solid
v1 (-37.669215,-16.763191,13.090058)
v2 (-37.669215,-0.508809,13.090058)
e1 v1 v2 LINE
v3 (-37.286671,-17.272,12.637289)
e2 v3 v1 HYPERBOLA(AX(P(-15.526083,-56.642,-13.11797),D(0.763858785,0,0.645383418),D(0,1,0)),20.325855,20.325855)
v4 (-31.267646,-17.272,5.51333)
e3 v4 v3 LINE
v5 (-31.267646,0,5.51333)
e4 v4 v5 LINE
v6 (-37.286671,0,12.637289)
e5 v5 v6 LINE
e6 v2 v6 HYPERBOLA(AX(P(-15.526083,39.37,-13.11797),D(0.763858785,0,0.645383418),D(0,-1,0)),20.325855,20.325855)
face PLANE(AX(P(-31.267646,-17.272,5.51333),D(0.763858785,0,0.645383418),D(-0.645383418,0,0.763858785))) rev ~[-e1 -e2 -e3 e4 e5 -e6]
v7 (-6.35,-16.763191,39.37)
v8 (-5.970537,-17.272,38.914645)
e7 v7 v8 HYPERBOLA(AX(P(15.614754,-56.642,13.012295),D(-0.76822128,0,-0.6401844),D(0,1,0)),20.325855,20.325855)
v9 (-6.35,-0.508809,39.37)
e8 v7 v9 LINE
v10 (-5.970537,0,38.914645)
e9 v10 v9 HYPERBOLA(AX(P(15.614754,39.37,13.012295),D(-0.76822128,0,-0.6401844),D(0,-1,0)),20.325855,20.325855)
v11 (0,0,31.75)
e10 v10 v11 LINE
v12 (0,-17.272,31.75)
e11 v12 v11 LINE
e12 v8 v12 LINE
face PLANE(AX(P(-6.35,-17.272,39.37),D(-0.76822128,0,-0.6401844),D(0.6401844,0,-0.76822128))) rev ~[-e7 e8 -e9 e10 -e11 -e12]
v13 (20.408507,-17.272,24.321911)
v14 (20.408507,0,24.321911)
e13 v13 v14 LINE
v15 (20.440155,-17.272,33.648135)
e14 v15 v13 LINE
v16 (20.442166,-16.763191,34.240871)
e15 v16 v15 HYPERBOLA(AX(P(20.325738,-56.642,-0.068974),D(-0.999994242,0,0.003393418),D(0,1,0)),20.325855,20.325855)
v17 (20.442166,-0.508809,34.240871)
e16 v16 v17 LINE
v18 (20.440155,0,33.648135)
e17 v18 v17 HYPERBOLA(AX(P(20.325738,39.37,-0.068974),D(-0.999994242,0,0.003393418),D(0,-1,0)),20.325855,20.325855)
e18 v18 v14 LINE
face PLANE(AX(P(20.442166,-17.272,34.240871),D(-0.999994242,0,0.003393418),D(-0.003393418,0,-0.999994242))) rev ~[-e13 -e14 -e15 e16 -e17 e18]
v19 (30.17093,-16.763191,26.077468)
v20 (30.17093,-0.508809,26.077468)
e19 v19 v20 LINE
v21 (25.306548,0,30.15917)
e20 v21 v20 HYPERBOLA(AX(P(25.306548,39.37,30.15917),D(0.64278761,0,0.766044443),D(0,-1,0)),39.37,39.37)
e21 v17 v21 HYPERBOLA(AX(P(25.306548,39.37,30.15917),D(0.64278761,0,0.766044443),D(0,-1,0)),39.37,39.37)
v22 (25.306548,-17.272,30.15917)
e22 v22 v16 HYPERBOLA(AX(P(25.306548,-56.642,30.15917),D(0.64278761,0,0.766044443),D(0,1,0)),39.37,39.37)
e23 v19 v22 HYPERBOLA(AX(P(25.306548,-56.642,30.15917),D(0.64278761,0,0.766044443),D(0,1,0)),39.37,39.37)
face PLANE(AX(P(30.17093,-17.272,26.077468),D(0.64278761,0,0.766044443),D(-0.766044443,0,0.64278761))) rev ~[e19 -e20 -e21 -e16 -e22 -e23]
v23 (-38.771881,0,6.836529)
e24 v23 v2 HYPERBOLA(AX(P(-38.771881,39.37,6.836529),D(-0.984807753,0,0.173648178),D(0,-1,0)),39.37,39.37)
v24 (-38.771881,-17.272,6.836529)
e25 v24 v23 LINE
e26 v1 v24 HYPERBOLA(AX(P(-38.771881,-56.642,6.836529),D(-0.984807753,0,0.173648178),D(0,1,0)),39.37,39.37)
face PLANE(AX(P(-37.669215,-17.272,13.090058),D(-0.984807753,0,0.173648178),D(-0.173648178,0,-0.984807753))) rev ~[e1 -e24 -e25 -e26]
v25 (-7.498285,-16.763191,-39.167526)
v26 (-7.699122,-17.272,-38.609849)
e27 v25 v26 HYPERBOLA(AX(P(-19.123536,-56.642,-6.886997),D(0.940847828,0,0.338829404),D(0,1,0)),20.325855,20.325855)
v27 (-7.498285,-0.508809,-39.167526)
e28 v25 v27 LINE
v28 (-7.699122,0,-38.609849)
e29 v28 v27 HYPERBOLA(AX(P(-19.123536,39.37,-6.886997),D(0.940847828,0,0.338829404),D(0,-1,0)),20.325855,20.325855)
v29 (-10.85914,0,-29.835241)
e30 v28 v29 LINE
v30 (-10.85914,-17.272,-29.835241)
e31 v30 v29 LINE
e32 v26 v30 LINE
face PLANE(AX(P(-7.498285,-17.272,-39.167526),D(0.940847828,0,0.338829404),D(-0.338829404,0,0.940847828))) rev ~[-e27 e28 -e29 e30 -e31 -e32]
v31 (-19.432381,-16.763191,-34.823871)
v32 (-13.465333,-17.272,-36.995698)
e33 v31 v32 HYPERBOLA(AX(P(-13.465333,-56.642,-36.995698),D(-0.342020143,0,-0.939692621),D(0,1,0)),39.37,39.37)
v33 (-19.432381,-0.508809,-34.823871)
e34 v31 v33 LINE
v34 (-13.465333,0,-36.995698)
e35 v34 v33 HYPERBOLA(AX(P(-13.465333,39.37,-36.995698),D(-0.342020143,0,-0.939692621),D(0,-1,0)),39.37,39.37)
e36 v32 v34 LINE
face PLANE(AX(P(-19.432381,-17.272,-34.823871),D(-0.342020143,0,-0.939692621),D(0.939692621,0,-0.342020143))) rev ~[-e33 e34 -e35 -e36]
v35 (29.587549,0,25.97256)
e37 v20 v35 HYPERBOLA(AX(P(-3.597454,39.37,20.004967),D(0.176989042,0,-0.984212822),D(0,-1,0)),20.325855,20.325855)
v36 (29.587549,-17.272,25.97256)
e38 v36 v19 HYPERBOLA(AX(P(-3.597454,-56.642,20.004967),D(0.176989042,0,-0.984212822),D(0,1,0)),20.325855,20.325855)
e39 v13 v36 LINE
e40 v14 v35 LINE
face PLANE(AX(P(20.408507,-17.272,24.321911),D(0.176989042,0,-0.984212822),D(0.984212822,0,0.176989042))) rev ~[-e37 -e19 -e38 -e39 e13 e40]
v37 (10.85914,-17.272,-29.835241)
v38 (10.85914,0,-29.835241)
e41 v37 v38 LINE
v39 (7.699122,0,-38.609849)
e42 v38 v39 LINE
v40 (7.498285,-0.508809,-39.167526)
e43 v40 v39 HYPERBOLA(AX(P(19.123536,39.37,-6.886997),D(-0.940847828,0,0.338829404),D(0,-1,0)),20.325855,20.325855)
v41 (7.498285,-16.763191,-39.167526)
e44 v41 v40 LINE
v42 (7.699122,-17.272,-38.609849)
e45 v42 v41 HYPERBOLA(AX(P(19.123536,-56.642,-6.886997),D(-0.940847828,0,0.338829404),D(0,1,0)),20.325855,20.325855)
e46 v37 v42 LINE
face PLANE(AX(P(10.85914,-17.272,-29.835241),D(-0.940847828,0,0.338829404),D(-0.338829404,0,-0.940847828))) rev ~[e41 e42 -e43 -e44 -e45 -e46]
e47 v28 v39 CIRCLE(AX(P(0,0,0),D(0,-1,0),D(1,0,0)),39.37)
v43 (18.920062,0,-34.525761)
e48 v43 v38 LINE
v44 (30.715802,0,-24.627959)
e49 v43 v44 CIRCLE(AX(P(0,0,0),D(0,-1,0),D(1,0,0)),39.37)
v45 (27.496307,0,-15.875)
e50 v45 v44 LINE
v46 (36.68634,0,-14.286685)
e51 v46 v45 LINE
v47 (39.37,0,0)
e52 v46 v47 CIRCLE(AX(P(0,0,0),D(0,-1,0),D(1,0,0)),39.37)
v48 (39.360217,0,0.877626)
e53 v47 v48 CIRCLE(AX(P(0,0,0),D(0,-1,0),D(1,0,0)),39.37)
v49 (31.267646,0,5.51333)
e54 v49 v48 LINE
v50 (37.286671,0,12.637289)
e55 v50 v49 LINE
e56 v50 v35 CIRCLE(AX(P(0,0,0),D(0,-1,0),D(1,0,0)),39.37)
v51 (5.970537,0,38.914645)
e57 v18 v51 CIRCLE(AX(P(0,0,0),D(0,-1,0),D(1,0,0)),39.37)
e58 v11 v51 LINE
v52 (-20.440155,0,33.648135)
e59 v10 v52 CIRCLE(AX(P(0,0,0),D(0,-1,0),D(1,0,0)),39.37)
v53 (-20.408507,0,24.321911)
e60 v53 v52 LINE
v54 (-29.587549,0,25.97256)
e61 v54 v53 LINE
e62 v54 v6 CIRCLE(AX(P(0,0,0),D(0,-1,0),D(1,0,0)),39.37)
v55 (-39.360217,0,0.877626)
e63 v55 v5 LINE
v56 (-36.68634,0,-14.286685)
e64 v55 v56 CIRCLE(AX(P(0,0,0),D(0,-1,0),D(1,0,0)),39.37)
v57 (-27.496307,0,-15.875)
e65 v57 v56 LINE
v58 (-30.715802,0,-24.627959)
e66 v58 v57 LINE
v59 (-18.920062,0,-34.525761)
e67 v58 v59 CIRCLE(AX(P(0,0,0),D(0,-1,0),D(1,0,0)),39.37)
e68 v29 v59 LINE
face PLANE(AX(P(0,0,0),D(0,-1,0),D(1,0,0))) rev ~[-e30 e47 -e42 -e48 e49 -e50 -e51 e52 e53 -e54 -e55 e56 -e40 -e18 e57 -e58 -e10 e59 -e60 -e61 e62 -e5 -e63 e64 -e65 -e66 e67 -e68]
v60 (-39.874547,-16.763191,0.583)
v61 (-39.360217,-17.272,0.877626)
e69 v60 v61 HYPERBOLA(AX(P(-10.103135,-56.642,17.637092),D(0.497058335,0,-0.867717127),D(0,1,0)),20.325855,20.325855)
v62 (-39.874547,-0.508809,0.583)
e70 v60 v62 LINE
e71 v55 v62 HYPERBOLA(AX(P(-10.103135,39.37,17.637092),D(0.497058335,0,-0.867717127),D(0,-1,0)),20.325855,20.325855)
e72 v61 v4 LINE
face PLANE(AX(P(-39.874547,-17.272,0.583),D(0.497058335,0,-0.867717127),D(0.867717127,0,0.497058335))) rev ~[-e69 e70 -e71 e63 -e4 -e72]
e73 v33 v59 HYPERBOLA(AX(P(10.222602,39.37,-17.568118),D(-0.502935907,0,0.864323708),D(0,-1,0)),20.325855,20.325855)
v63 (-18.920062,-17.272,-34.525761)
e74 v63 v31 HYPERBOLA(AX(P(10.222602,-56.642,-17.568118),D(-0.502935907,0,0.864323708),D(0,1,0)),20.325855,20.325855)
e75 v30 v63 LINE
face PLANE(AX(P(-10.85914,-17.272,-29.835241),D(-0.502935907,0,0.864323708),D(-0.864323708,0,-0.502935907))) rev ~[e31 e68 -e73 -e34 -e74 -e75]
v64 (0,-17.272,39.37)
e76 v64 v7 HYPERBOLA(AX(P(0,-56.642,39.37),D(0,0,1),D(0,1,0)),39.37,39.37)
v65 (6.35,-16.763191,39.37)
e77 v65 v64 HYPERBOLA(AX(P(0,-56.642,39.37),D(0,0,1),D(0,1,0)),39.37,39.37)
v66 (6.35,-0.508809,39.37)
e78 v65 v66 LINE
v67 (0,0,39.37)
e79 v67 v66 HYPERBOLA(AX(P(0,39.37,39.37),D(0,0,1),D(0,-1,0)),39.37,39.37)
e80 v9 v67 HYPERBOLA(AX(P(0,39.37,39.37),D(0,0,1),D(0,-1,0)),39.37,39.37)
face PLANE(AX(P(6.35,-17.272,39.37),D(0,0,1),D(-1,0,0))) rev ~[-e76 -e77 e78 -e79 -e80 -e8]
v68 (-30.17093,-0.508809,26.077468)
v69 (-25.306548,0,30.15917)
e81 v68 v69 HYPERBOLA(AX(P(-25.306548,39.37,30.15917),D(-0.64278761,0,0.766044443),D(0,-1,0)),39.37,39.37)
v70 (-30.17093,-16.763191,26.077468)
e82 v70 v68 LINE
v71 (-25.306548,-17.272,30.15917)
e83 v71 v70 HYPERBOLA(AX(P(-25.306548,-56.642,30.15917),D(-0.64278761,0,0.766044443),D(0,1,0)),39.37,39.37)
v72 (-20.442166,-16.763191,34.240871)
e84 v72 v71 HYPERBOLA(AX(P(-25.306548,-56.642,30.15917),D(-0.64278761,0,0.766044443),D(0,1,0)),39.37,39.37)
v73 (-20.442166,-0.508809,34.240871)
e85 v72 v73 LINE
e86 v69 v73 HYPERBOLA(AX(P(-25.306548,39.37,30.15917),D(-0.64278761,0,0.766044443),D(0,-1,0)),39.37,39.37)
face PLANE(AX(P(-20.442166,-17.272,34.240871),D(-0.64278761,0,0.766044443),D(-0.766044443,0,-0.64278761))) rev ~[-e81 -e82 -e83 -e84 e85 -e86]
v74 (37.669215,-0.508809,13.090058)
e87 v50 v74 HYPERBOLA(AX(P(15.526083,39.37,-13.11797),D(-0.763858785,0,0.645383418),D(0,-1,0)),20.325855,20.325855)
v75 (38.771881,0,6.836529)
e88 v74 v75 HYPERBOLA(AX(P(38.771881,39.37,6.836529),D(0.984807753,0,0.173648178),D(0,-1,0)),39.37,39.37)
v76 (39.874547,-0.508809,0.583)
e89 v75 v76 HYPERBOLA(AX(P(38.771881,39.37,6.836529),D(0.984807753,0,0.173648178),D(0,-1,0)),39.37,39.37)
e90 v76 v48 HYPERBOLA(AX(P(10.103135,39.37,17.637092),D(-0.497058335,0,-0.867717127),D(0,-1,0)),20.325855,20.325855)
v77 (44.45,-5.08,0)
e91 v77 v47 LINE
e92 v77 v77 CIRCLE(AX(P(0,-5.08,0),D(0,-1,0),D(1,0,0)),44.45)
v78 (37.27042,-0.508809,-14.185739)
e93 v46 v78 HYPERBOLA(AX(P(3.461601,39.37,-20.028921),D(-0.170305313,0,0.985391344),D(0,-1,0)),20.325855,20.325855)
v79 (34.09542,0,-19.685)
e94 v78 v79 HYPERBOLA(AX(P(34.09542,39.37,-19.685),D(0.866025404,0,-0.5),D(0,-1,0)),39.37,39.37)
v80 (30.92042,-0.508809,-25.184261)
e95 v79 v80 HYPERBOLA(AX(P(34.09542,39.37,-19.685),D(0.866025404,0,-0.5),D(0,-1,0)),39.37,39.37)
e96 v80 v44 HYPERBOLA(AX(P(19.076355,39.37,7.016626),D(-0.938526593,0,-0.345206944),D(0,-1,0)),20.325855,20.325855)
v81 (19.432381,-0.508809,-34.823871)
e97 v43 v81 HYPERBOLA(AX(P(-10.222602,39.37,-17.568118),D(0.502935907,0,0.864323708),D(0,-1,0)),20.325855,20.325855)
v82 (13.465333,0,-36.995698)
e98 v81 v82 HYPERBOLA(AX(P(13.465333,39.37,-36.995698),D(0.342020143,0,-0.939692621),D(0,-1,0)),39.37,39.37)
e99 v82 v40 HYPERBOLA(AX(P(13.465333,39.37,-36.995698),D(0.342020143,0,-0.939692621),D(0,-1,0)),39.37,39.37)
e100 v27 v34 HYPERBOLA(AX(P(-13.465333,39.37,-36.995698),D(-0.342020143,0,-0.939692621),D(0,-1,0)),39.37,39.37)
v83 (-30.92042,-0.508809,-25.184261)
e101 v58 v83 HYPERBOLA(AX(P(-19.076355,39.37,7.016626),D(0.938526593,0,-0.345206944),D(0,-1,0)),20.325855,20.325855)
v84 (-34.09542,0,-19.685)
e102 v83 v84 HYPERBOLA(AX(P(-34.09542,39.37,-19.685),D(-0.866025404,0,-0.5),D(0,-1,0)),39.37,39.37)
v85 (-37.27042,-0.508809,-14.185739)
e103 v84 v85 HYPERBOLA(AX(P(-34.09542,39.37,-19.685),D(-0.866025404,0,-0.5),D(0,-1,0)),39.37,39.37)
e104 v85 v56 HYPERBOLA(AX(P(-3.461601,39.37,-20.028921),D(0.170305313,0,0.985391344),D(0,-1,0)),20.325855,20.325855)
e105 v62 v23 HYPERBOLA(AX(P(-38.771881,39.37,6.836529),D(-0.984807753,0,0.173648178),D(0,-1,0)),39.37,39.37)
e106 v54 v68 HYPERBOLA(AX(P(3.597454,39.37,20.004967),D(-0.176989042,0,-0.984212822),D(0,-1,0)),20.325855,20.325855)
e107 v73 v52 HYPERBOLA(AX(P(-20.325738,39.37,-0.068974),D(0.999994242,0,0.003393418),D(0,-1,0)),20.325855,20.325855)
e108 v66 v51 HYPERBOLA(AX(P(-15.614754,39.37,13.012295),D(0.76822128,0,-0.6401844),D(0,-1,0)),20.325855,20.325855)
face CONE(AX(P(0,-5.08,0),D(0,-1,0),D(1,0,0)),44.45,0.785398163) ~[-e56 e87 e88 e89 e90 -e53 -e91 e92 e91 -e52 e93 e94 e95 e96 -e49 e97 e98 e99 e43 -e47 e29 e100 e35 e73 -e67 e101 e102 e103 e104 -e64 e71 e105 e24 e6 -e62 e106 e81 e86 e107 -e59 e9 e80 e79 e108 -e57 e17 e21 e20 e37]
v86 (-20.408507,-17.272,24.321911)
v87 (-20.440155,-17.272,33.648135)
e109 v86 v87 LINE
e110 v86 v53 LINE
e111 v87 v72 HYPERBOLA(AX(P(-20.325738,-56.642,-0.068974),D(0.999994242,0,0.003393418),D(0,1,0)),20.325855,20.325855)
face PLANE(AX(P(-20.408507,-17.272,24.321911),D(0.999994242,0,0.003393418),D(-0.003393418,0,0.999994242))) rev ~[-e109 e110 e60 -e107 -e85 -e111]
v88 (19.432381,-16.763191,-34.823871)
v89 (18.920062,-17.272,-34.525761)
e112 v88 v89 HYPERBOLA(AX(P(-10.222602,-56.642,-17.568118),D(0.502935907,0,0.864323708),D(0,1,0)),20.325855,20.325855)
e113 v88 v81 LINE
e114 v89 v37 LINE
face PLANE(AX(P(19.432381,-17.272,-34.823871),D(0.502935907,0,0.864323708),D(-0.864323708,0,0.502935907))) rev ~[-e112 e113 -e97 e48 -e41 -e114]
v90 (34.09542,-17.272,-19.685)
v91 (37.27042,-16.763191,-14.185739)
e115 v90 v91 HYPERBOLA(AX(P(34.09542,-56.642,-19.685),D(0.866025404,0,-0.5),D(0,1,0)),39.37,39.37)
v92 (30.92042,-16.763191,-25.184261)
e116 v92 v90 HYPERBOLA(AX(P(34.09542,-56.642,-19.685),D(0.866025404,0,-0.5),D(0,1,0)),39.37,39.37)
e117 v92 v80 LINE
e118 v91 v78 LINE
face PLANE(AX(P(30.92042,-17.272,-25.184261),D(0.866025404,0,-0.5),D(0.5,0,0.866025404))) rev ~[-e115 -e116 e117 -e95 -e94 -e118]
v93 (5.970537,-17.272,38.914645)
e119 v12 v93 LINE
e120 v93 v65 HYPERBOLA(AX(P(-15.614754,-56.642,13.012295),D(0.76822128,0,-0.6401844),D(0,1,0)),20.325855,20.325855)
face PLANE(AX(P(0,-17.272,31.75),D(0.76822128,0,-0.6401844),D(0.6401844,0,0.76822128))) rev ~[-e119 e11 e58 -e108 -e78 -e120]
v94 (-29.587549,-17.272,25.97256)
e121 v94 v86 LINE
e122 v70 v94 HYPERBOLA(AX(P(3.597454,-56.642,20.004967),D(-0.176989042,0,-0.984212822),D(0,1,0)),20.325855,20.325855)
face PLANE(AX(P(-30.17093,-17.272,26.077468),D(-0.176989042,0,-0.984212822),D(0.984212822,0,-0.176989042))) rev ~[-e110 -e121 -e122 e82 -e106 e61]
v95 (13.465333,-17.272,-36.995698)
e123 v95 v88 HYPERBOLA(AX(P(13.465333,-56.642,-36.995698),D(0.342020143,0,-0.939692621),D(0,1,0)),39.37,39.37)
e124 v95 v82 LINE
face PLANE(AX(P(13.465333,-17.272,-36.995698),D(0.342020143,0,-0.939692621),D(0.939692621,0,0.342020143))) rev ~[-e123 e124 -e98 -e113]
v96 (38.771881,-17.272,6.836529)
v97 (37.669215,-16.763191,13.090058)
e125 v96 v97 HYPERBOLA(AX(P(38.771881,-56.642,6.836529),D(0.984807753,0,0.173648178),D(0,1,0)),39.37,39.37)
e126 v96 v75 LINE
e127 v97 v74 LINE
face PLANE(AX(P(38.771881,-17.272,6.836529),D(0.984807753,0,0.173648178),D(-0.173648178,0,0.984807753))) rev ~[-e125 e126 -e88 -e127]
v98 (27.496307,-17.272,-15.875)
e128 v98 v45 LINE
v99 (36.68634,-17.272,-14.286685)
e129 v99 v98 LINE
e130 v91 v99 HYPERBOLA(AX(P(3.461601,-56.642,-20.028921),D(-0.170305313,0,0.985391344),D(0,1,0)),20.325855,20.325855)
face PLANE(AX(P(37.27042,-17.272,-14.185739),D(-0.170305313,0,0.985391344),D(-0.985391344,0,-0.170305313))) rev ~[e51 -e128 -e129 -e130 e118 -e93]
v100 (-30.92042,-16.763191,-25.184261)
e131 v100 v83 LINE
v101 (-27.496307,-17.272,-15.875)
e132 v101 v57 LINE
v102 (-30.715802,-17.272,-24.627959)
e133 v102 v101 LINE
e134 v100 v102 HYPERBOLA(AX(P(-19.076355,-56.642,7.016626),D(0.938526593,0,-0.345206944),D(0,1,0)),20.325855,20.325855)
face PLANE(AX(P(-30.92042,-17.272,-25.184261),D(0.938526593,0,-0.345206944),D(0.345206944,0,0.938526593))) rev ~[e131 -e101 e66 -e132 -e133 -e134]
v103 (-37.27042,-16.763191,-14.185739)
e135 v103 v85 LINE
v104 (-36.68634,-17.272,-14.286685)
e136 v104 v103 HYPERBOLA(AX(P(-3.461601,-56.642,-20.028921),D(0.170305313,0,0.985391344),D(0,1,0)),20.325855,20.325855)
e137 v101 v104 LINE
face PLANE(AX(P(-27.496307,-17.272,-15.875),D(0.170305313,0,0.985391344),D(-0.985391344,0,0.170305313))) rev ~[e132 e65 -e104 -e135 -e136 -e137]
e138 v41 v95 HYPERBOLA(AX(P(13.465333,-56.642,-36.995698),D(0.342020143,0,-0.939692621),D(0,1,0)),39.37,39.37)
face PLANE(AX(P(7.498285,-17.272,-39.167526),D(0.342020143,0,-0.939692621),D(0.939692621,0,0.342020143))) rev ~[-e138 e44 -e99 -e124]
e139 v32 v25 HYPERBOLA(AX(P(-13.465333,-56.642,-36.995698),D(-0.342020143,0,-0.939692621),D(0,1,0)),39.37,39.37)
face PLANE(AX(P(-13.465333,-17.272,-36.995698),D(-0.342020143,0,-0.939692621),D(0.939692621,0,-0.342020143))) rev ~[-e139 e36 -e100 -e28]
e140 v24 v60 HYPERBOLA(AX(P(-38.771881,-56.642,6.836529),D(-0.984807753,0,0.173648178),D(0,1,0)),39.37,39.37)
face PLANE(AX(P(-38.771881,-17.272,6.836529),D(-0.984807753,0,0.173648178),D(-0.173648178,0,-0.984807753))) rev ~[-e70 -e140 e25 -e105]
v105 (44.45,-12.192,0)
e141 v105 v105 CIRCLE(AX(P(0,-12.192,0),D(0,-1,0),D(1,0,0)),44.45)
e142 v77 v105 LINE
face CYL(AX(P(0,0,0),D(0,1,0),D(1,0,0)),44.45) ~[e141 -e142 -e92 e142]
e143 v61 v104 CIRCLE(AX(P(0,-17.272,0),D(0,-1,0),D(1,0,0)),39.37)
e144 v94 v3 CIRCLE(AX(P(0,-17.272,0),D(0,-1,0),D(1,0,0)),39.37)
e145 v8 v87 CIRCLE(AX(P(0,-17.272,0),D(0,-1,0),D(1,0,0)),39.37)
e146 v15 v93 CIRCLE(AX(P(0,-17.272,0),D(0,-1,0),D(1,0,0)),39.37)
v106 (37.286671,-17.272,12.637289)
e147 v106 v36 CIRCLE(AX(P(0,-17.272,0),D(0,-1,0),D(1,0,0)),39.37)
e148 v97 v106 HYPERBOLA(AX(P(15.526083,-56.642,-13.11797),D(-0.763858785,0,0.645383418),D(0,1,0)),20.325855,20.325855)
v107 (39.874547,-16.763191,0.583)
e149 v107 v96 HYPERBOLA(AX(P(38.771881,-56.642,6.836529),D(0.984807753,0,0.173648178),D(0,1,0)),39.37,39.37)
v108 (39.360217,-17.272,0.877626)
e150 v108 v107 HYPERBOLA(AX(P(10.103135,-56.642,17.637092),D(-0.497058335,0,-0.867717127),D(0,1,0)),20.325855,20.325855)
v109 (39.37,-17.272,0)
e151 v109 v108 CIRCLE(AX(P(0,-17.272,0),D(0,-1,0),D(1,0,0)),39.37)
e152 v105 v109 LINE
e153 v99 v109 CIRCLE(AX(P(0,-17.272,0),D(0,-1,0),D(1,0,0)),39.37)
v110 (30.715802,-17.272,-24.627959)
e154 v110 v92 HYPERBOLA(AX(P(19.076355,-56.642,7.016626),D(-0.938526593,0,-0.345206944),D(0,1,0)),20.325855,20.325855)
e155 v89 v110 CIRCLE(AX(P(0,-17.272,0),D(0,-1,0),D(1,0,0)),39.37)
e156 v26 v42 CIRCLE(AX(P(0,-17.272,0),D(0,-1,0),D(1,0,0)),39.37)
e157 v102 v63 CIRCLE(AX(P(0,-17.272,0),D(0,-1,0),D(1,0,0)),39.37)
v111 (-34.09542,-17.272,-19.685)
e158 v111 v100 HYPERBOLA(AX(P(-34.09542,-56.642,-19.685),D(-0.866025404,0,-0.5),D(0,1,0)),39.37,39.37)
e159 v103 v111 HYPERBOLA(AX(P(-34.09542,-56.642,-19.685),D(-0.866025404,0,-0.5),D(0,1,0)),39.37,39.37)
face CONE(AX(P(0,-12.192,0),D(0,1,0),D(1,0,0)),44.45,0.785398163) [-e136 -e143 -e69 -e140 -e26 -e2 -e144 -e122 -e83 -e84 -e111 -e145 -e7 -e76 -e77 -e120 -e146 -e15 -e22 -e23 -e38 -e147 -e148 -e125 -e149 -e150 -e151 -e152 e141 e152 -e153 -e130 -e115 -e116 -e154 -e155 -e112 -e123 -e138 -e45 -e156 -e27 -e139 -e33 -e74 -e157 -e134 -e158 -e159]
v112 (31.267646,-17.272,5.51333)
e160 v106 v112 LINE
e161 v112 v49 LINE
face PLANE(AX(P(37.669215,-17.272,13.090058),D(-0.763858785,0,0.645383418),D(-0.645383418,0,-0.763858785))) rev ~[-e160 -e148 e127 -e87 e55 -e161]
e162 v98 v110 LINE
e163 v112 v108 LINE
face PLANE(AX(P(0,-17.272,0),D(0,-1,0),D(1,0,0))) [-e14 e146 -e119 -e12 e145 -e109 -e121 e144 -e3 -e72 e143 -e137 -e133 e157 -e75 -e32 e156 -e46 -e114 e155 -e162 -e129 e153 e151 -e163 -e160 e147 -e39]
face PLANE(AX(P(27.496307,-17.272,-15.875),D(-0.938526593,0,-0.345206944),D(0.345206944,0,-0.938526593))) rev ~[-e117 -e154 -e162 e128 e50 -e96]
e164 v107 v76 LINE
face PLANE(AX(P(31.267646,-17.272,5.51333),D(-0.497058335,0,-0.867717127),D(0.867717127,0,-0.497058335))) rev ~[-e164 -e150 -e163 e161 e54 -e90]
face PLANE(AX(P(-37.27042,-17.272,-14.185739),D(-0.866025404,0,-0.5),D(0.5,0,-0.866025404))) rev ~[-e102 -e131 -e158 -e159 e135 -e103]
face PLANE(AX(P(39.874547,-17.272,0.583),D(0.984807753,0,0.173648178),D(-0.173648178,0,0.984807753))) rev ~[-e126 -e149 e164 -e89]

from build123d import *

# Parameters (mm, degrees)
F0_R     = 44.45
F1_DEPTH = 17.272
F3_DEPTH = 17.273


# Not quite as in the source:
# - a fillet or chamfer that OpenCascade refuses, or shapes differently, is made with other operations: its cross-section is extruded or revolved along the edge and cut away or added


with BuildPart() as f1:
    # F0 (on Front) → F1 (new body)
    with BuildSketch(Plane.XZ):
        Circle(F0_R)
    extrude(amount=F1_DEPTH)

    # F2 (on face) → F3 (cut, through all)
    with BuildSketch(Plane.XZ.offset(17.272)):
        Polygon((6.35, 39.37), (0, 39.37), (-6.35, 39.37), (0, 31.75), align=None)
        Polygon((-20.4085066075, 24.321911069), (-20.4421659796, 34.2408710471), (-25.3065481934, 30.1591697256), (-30.1709304072, 26.0774684041), align=None)
        Polygon((-31.2676461581, 5.5133296409), (-37.6692153079, 13.0900579864), (-38.7718812361, 6.8365287547), (-39.8745471643, 0.5829995231), align=None)
        Polygon((-27.4963065702, -15.875), (-37.270420147, -14.185738686), (-34.095420147, -19.685), (-30.920420147, -25.184261314), align=None)
        Polygon((-10.8591395506, -29.83524071), (-19.4323811847, -34.8238705702), (-13.4653330427, -36.9956984803), (-7.4982849007, -39.1675263905), align=None)
        Polygon((10.8591395506, -29.83524071), (7.4982849007, -39.1675263905), (13.4653330427, -36.9956984803), (19.4323811847, -34.8238705702), align=None)
        Polygon((27.4963065702, -15.875), (30.920420147, -25.184261314), (34.095420147, -19.685), (37.270420147, -14.185738686), align=None)
        Polygon((31.2676461581, 5.5133296409), (39.8745471643, 0.5829995231), (38.7718812361, 6.8365287547), (37.6692153079, 13.0900579864), align=None)
        Polygon((20.4085066075, 24.321911069), (30.1709304072, 26.0774684041), (25.3065481934, 30.1591697256), (20.4421659796, 34.2408710471), align=None)
    extrude(amount=-F3_DEPTH, mode=Mode.SUBTRACT)

    # F4: chamfer of 5.08 on 2 edges, made by hand

    # F4_s1 → F4_t2 (revolve, cut)
    with BuildSketch(Plane.XY):
        Polygon((44.45, -12.192), (39.37, -17.272), (44.45, -17.272), align=None)
    revolve(axis=Axis((0, -17.272, 0), (0, -1, 0)), mode=Mode.SUBTRACT)

    # F4_s3 → F4_t4 (revolve, cut)
    with BuildSketch(Plane.XY):
        Polygon((44.45, -5.08), (39.37, 0), (44.45, 0), align=None)
    revolve(axis=Axis((0, 0, 0), (0, -1, 0)), mode=Mode.SUBTRACT)


solid = f1.part
